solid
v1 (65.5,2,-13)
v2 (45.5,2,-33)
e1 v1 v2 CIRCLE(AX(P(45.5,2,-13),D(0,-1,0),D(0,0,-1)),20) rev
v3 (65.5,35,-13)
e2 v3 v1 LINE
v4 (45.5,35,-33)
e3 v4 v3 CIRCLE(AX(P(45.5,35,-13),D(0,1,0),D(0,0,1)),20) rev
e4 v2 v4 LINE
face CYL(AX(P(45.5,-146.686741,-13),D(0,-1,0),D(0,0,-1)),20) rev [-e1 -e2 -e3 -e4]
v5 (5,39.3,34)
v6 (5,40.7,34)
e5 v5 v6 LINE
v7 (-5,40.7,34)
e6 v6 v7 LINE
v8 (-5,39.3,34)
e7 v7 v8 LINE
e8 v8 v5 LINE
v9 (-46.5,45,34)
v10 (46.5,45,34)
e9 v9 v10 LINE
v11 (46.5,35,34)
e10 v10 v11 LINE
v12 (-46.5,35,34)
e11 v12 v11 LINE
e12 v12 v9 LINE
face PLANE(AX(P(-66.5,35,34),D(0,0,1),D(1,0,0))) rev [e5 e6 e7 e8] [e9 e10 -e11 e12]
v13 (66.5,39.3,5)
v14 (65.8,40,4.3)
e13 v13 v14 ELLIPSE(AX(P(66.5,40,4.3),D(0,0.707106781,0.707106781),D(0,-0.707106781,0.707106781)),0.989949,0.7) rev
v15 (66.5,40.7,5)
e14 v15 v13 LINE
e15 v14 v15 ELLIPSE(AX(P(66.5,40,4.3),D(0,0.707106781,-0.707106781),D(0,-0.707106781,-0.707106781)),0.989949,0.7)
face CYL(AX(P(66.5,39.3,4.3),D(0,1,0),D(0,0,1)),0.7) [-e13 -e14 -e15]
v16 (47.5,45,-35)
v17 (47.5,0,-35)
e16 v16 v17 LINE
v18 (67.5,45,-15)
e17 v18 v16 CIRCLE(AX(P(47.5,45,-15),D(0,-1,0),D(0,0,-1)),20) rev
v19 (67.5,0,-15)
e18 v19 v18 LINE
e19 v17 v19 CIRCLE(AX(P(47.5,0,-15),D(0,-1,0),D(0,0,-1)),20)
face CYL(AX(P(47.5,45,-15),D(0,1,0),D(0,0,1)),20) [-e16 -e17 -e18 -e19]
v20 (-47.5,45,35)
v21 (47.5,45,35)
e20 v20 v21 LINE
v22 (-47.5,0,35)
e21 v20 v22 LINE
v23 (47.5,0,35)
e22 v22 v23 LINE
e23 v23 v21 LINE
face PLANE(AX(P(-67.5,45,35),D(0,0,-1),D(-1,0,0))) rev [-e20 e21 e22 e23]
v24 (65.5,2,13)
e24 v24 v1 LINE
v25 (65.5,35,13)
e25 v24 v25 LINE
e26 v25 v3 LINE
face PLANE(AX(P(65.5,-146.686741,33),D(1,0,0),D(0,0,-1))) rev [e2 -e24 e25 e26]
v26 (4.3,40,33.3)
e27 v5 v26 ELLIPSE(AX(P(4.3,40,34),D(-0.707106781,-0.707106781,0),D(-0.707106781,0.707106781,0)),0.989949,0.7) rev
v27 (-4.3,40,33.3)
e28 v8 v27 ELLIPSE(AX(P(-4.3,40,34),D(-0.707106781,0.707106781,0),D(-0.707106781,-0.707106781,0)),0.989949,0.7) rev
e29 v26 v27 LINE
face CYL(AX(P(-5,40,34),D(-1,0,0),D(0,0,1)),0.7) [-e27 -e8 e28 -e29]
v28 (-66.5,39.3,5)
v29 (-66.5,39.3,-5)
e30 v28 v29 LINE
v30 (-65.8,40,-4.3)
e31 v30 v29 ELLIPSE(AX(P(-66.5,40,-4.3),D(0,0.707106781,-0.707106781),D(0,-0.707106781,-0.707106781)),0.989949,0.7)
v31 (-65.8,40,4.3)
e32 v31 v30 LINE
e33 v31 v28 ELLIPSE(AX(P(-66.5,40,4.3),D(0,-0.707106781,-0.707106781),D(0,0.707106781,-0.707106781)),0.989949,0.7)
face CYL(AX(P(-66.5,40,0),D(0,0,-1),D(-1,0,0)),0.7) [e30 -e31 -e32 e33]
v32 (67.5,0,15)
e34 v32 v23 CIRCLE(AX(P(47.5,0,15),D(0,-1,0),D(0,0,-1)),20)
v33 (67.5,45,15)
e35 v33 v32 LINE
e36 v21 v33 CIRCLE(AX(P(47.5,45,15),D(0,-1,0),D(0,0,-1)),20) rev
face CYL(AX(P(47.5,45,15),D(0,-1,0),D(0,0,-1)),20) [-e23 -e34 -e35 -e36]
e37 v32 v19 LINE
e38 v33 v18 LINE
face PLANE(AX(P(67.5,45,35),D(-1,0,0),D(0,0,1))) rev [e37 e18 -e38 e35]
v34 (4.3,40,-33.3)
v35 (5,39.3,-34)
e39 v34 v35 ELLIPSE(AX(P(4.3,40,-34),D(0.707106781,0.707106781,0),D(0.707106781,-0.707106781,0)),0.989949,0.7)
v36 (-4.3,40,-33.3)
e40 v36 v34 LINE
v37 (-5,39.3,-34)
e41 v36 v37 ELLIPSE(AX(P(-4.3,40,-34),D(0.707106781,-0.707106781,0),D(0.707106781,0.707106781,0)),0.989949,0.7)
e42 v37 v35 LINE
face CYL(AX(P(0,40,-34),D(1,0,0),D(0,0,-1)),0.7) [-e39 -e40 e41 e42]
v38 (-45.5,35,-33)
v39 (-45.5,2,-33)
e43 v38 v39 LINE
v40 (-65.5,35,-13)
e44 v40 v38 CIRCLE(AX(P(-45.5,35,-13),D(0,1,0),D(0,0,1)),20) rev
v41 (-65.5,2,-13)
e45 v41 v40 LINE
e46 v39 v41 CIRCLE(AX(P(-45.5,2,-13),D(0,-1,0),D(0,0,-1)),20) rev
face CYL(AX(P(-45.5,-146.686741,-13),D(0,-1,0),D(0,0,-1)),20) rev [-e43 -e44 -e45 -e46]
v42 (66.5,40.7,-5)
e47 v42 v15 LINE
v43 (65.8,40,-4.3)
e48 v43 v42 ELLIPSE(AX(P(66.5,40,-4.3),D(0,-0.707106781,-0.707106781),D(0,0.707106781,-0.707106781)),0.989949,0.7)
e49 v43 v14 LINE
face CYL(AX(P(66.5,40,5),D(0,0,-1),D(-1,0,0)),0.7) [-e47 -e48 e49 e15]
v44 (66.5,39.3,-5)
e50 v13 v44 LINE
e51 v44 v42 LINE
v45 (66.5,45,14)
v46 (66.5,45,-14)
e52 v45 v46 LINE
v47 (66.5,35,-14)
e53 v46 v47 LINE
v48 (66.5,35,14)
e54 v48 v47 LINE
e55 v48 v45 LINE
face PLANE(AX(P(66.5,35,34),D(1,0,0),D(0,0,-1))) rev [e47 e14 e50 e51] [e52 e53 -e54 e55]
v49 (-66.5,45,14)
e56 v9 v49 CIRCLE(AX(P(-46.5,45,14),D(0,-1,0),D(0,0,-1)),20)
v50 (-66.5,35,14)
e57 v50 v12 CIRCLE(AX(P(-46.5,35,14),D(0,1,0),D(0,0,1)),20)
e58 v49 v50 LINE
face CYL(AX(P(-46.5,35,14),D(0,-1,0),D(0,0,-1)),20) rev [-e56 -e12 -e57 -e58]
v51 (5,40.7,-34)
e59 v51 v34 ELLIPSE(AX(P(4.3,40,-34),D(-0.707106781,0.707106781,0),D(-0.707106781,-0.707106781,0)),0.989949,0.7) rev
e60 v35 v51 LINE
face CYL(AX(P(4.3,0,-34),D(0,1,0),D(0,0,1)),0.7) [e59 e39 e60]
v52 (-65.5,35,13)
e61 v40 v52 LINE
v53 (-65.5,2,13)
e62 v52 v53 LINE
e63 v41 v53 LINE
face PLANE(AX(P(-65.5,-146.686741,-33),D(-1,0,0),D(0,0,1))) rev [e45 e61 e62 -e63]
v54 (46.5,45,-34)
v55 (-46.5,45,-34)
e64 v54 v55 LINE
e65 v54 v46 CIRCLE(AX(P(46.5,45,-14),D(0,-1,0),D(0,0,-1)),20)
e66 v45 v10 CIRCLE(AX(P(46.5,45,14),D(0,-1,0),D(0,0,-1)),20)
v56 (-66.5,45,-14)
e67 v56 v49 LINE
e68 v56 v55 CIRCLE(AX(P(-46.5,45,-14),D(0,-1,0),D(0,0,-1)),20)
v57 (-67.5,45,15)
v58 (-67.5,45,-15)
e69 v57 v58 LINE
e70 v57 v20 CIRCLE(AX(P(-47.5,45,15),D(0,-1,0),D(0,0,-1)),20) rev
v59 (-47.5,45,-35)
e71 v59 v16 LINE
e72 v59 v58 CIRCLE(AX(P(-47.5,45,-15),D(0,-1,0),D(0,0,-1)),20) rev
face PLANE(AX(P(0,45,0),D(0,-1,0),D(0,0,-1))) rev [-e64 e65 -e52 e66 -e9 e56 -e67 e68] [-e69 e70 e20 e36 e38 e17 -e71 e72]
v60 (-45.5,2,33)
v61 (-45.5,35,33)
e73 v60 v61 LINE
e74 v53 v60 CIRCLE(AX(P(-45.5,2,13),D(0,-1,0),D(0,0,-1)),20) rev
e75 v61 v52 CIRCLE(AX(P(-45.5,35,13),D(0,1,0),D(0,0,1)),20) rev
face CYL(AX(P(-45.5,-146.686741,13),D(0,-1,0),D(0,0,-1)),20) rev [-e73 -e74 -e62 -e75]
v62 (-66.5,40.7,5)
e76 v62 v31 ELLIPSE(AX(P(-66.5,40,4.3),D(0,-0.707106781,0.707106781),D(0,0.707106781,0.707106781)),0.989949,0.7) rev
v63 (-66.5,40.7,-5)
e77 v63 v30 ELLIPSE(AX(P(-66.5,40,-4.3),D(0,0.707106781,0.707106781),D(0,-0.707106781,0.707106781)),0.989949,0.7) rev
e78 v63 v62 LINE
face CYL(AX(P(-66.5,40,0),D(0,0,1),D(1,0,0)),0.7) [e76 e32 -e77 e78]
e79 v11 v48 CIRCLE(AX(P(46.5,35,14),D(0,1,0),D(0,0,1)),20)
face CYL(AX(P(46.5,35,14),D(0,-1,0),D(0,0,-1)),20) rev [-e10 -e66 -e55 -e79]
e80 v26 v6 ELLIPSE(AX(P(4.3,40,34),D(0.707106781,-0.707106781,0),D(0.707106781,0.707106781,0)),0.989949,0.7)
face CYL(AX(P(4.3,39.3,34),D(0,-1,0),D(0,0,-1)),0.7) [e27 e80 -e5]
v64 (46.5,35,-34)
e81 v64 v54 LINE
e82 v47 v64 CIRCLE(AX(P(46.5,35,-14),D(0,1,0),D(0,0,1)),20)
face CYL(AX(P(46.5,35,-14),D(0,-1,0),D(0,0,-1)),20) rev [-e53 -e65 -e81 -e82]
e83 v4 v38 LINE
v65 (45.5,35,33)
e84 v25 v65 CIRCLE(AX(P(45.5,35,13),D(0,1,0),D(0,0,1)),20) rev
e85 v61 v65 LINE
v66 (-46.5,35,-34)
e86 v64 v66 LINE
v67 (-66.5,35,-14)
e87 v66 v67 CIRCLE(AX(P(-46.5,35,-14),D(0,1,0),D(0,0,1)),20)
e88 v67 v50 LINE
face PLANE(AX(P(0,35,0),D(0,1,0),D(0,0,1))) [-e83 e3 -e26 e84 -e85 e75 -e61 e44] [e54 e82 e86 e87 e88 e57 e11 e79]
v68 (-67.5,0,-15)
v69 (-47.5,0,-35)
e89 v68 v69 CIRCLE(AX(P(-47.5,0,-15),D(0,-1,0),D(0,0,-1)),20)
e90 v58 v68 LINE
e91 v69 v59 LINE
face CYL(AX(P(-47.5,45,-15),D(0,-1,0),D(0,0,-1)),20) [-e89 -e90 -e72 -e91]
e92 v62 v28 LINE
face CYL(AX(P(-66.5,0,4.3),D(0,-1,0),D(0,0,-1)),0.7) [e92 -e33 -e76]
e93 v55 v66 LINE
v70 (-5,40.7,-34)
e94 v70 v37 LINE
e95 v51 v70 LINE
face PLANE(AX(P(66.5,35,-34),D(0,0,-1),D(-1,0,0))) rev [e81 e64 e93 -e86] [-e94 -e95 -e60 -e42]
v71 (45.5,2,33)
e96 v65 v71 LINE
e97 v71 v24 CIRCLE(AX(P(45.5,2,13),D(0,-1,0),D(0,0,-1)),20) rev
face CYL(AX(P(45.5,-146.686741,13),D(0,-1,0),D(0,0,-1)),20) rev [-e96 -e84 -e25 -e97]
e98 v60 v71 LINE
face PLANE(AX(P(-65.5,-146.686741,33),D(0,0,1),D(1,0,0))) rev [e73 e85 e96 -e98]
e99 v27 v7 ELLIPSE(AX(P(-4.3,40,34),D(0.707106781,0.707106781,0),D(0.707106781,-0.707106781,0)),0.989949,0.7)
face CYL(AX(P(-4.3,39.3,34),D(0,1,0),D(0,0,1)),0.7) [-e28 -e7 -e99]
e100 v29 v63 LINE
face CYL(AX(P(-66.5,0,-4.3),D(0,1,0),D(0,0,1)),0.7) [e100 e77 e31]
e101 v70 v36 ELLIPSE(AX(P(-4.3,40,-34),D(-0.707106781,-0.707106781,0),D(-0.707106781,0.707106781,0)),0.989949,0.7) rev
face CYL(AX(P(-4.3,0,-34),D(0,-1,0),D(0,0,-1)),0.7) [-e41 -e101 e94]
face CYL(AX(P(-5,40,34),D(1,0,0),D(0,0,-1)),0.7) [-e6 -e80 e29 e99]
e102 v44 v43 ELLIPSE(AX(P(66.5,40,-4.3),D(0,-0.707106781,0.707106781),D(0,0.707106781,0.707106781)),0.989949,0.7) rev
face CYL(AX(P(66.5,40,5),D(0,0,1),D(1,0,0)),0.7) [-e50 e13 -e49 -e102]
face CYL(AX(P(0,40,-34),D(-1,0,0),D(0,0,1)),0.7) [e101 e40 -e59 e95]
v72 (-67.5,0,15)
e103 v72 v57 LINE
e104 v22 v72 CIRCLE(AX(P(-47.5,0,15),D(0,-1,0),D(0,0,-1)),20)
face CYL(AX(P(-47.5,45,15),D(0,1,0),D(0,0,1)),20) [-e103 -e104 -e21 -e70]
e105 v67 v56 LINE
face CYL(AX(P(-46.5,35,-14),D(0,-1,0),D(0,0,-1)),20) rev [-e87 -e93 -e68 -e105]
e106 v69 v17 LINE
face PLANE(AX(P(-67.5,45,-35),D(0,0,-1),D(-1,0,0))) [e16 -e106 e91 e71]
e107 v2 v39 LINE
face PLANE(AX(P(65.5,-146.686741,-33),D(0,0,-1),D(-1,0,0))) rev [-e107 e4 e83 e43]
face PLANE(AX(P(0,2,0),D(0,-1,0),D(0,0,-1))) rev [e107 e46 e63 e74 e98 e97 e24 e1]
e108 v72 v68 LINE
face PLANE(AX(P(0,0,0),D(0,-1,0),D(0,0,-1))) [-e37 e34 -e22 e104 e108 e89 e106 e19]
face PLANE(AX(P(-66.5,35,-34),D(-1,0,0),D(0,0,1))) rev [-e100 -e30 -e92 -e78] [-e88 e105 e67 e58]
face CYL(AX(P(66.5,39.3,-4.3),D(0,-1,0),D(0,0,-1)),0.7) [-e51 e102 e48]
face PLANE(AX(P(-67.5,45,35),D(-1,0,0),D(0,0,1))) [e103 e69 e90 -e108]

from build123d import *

# Parameters (mm, degrees)
SKETCH_1_W             = 135
SKETCH_1_H             = 70
EXTRUDE_1_DEPTH        = 45
SKETCH_2_W             = 133
SKETCH_2_H             = 68
CUT_EXTRUDE_1_DEPTH    = 10
SKETCH_4_W             = 131
SKETCH_4_H             = 66
CUT_EXTRUDE_3_DEPTH    = 33
FILLET_3_R             = 20
SKETCH_5_W             = 10
SKETCH_5_H             = 1.4
EXTRUDE_2_DEPTH        = 0.7
FILLET_5_R             = 0.7
FILLET_5_OF_MIRROR_2_R = 0.7
SKETCH_6_W             = 10
SKETCH_6_H             = 1.4
EXTRUDE_3_DEPTH        = 0.7
FILLET_6_R             = 0.7
FILLET_6_OF_MIRROR_3_R = 0.7


with BuildPart() as part:
    # 草图1 → 凸台-拉伸1 (new body)
    with BuildSketch(Plane(origin=(0, 0, 0), x_dir=(1, 0, 0), z_dir=(0, 1, 0))):
        Rectangle(SKETCH_1_W, SKETCH_1_H)
    extrude(amount=EXTRUDE_1_DEPTH)

    # 草图2 → 切除-拉伸1 (cut)
    with BuildSketch(Plane(origin=(0, 45, 0), x_dir=(1, 0, 0), z_dir=(0, 1, 0))):
        Rectangle(SKETCH_2_W, SKETCH_2_H)
    extrude(amount=-CUT_EXTRUDE_1_DEPTH, mode=Mode.SUBTRACT)

    # 草图4 → 切除-拉伸3 (cut)
    with BuildSketch(Plane(origin=(0, 35, 0), x_dir=(1, 0, 0), z_dir=(0, 1, 0))):
        Rectangle(SKETCH_4_W, SKETCH_4_H)
    extrude(amount=-CUT_EXTRUDE_3_DEPTH, mode=Mode.SUBTRACT)

    # 圆角3
    fillet_3_edges = [part.edges().sort_by_distance(p)[0] for p in [
        (-66.5, 40, -34),
        (66.5, 40, -34),
        (66.5, 40, 34),
        (-66.5, 40, 34),
        (65.5, 18.5, -33),
        (-65.5, 18.5, -33),
        (-65.5, 18.5, 33),
        (65.5, 18.5, 33),
        (-67.5, 22.5, 35),
        (67.5, 22.5, 35),
        (67.5, 22.5, -35),
        (-67.5, 22.5, -35),
    ]]
    fillet(fillet_3_edges, radius=FILLET_3_R)

    # 草图5 → 凸台-拉伸2 (add)
    with BuildSketch(Plane.XY.offset(-34)):
        with Locations((0, 40)):
            Rectangle(SKETCH_5_W, SKETCH_5_H)
    extrude_2 = extrude(amount=EXTRUDE_2_DEPTH)

    # 圆角5
    fillet_5_edges = [part.edges().sort_by_distance(p)[0] for p in [
        (5, 40, -33.3),
        (-5, 40, -33.3),
        (0, 39.3, -33.3),
        (0, 40.7, -33.3),
    ]]
    fillet(fillet_5_edges, radius=FILLET_5_R - 0.0001)  # a hair under: the kernel refuses the full size

    # 镜向2: 凸台-拉伸2 across plane
    add(extrude_2.mirror(Plane.XY))

    # 圆角5 of 镜向2
    fillet_5_of_mirror_2_edges = [part.edges().sort_by_distance(p)[0] for p in [
        (5, 40, 33.3),
        (-5, 40, 33.3),
        (0, 39.3, 33.3),
        (0, 40.7, 33.3),
    ]]
    fillet(fillet_5_of_mirror_2_edges, radius=FILLET_5_OF_MIRROR_2_R - 0.0001)  # a hair under: the kernel refuses the full size

    # 草图6 → 凸台-拉伸3 (add)
    with BuildSketch(Plane(origin=(-66.5, 0, 0), x_dir=(0, 0, -1), z_dir=(1, 0, 0))):
        with Locations((0, 40)):
            Rectangle(SKETCH_6_W, SKETCH_6_H)
    extrude_3 = extrude(amount=EXTRUDE_3_DEPTH)

    # 圆角6
    fillet_6_edges = [part.edges().sort_by_distance(p)[0] for p in [
        (-65.8, 40, -5),
        (-65.8, 40, 5),
        (-65.8, 39.3, 0),
        (-65.8, 40.7, 0),
    ]]
    fillet(fillet_6_edges, radius=FILLET_6_R - 0.0001)  # a hair under: the kernel refuses the full size

    # 镜向3: 凸台-拉伸3 across plane
    add(extrude_3.mirror(Plane(origin=(0, 0, 0), x_dir=(0, 0, 1), z_dir=(1, 0, 0))))

    # 圆角6 of 镜向3
    fillet_6_of_mirror_3_edges = [part.edges().sort_by_distance(p)[0] for p in [
        (65.8, 40, -5),
        (65.8, 40, 5),
        (65.8, 39.3, 0),
        (65.8, 40.7, 0),
    ]]
    fillet(fillet_6_of_mirror_3_edges, radius=FILLET_6_OF_MIRROR_3_R - 0.0001)  # a hair under: the kernel refuses the full size


solid = part.part
